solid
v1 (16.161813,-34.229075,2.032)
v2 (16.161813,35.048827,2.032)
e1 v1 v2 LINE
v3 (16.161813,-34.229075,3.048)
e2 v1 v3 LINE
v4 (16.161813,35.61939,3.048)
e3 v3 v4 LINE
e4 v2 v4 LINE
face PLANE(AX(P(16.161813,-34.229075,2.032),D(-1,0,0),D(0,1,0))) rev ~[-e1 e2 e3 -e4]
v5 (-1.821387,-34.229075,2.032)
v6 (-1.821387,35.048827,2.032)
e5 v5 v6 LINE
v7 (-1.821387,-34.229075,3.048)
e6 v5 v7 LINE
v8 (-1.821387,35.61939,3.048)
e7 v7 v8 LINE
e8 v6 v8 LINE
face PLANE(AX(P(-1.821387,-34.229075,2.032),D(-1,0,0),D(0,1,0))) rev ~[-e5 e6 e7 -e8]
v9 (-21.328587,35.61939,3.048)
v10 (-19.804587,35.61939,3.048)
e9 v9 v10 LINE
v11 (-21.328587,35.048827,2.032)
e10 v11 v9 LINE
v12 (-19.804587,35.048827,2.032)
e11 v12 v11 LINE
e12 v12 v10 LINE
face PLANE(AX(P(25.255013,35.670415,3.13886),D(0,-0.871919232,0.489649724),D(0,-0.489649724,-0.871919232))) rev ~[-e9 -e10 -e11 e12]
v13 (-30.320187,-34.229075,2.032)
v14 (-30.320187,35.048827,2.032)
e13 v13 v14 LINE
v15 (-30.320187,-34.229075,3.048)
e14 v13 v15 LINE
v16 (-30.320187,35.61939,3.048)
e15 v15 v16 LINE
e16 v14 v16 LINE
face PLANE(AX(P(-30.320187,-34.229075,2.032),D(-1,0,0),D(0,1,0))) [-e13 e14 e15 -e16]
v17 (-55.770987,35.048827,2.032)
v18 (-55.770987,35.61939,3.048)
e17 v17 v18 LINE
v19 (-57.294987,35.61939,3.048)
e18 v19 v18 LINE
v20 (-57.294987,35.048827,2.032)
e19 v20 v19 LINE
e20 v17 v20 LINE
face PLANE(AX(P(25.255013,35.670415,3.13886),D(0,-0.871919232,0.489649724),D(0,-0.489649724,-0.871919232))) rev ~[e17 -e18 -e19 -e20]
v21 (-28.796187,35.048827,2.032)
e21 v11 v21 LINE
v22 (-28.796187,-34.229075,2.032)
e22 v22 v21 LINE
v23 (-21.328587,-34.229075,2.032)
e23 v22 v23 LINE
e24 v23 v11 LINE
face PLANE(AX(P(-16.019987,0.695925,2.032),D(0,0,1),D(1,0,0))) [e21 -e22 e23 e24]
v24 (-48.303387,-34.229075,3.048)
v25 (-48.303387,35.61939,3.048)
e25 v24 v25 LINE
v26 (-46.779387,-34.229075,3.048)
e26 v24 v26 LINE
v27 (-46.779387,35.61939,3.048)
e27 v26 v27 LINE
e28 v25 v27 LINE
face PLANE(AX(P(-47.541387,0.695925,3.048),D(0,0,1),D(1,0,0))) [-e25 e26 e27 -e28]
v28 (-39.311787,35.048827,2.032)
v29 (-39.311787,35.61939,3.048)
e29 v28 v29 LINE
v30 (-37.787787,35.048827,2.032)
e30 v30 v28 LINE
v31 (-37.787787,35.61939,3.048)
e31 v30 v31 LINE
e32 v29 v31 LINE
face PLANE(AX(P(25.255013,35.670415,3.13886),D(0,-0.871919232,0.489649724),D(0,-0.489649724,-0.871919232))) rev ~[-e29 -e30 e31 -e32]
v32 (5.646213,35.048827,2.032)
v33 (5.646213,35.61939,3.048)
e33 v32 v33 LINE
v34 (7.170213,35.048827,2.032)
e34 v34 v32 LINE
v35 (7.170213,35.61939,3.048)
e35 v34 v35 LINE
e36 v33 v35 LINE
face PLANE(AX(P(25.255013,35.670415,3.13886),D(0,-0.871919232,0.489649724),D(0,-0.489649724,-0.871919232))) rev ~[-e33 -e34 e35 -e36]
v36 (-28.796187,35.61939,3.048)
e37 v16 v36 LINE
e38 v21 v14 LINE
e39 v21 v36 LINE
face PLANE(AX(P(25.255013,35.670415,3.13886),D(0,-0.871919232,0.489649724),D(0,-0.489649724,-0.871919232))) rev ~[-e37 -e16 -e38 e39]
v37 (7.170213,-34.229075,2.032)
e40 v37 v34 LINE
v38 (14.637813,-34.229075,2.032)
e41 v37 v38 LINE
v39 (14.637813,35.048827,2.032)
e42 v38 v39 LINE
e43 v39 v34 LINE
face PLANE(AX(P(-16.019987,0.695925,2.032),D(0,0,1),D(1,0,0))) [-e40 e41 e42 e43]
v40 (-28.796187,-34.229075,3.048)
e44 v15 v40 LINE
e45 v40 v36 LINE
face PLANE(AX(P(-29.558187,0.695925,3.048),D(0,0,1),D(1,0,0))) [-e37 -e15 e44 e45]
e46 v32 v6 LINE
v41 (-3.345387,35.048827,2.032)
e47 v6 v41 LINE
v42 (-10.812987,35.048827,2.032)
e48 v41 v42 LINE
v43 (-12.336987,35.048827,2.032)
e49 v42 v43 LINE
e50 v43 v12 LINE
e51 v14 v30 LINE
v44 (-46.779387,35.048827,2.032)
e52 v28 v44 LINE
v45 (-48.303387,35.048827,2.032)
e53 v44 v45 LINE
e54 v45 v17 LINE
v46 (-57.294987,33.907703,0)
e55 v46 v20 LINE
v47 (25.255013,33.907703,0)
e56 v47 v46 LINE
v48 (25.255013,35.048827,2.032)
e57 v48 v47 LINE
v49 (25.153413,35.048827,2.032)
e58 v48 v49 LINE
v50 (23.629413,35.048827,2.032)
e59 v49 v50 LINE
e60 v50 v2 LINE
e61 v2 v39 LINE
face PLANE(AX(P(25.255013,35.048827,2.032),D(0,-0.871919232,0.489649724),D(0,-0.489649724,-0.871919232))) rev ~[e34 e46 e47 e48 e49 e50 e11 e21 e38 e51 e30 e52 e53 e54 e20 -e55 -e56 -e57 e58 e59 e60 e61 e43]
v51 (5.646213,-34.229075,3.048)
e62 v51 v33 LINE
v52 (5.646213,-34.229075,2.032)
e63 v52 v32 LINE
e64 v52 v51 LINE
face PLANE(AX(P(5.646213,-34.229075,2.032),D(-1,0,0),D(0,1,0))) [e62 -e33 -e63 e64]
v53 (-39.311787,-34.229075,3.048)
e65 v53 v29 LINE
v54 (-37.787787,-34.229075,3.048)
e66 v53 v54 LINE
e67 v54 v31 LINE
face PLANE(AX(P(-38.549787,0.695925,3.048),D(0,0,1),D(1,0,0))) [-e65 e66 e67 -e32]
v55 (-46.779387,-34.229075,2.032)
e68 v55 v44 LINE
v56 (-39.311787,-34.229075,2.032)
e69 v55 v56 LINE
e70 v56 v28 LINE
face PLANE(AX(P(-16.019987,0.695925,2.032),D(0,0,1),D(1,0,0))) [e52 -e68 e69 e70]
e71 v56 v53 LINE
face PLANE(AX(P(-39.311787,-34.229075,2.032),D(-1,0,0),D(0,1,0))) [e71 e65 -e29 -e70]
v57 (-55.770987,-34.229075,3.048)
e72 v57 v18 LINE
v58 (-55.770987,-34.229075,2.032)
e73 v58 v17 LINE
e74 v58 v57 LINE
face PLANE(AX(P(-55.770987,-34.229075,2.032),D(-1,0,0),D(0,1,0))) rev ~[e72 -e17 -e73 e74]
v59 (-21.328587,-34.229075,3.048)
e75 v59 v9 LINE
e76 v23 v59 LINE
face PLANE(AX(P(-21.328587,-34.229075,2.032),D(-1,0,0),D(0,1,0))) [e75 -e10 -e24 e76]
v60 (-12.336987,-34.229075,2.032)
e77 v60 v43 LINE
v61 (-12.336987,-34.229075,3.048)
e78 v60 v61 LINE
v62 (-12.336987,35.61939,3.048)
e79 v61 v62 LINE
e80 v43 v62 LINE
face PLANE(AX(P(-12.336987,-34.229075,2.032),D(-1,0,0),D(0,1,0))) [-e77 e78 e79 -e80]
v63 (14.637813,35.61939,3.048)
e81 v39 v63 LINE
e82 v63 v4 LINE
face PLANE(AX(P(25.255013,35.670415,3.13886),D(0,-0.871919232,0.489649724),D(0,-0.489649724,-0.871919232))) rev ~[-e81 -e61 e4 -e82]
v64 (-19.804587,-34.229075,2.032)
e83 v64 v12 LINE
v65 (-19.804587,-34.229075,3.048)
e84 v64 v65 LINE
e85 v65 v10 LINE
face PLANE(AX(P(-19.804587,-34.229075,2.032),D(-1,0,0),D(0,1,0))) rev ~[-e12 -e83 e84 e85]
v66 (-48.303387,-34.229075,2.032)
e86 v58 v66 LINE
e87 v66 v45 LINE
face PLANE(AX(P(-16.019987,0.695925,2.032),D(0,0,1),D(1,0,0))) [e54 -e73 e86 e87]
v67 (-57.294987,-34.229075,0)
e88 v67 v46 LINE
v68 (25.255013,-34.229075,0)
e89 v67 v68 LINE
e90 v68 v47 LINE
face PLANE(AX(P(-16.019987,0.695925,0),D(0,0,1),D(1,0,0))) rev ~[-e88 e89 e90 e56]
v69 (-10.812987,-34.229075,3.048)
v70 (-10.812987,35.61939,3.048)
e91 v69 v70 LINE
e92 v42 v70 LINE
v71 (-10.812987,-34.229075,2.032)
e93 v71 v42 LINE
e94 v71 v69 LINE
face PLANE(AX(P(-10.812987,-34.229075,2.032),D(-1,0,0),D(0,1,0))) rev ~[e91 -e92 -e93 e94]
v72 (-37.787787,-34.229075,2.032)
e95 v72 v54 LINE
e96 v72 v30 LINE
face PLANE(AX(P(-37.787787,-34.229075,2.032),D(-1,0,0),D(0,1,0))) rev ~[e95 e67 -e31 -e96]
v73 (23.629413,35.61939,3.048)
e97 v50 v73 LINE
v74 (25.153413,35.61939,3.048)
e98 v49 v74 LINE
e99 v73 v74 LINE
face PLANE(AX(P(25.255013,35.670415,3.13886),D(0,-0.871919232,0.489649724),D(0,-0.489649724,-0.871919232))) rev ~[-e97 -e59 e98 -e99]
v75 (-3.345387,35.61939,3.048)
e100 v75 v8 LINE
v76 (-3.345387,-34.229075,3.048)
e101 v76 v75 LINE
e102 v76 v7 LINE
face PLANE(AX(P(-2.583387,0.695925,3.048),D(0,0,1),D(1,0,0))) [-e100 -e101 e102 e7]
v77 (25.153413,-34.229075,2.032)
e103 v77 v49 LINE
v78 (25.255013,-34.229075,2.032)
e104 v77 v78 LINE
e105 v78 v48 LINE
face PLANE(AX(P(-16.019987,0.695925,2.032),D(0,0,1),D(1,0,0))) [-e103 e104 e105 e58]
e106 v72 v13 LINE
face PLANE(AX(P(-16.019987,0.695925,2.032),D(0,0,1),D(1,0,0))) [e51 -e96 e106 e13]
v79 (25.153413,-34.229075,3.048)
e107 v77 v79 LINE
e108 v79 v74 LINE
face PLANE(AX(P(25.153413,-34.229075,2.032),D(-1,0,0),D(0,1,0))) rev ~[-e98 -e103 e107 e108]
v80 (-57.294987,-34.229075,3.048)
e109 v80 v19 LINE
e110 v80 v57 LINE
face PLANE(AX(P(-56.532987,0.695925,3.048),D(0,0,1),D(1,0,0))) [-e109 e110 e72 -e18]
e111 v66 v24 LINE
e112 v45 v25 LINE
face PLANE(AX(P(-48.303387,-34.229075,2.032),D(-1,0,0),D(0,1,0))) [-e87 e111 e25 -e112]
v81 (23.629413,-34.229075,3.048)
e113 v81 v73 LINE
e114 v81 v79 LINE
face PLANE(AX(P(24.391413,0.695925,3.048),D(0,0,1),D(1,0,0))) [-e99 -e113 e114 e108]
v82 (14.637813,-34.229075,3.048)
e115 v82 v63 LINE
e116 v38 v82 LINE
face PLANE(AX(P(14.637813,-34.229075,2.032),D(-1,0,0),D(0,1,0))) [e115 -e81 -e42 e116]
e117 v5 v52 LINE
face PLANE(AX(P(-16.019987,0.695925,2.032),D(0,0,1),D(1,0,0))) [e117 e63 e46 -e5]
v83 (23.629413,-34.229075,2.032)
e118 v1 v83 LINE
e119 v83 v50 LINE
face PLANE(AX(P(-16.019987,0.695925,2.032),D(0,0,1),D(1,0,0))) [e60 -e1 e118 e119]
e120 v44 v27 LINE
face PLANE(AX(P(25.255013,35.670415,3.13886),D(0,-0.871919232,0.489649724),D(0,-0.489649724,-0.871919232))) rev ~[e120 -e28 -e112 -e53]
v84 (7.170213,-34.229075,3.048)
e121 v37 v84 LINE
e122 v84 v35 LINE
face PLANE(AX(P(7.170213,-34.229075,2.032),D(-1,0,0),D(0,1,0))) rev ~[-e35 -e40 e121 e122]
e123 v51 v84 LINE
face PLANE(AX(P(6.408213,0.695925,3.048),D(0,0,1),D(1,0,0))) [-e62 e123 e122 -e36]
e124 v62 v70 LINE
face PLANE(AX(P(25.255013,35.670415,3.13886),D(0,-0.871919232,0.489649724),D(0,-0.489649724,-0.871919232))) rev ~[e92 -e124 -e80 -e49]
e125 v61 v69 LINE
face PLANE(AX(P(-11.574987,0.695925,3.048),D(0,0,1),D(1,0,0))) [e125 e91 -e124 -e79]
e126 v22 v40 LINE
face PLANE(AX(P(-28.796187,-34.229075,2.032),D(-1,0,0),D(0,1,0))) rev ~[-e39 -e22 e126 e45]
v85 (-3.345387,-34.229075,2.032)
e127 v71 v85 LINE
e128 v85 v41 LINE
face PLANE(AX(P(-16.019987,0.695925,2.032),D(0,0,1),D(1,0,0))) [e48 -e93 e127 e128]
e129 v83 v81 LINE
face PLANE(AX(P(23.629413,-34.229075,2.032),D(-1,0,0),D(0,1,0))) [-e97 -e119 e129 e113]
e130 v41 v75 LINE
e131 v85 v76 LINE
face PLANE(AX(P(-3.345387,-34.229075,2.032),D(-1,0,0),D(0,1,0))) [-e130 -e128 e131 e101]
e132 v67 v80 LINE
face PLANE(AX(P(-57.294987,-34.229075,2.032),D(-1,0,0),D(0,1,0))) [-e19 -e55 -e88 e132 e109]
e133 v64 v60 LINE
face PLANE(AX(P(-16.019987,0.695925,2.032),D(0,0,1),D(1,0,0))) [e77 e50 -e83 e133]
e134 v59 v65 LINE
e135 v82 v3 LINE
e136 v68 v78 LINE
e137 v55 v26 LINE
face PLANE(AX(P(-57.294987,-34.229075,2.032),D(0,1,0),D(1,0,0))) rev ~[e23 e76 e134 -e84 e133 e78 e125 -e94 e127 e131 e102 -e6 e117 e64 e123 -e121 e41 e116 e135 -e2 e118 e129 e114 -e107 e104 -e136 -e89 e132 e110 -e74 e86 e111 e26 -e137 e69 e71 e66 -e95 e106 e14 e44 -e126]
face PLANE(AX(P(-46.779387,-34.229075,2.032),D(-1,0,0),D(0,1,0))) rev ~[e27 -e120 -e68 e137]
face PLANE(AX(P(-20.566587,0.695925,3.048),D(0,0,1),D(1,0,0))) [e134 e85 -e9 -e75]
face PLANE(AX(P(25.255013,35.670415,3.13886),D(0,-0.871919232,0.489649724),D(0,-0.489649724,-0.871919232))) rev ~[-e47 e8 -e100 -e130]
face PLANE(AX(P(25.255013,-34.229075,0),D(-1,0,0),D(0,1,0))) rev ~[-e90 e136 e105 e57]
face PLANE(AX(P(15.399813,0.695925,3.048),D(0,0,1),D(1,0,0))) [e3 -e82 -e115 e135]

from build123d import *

# Parameters (mm, degrees)
F0_W     = 82.55
F0_H     = 69.85
F1_DEPTH = 2.032
F2_W     = 1.524
F2_H     = 69.85
F3_DEPTH = 1.016
F5_DEPTH = 88.8746


with BuildPart() as f1:
    # F0 (on Top) → F1 (new body)
    with BuildSketch(Plane.XY):
        with Locations((-16.0199867169, 0.6959252059)):
            Rectangle(F0_W, F0_H)
    extrude(amount=F1_DEPTH)

    # F2 (on face) → F3 (join)
    with BuildSketch(Plane.XY.offset(2.032)):
        with Locations((-56.5329867169, 0.6959252059)):
            Rectangle(F2_W, F2_H)
        with Locations((-47.5413867169, 0.6959252059)):
            Rectangle(F2_W, F2_H)
        with Locations((-38.5497867169, 0.6959252059)):
            Rectangle(F2_W, F2_H)
        with Locations((-29.5581867169, 0.6959252059)):
            Rectangle(F2_W, F2_H)
        with Locations((-20.5665867169, 0.6959252059)):
            Rectangle(F2_W, F2_H)
        with Locations((-11.5749867169, 0.6959252059)):
            Rectangle(F2_W, F2_H)
        with Locations((-2.5833867169, 0.6959252059)):
            Rectangle(F2_W, F2_H)
        with Locations((6.4082132831, 0.6959252059)):
            Rectangle(F2_W, F2_H)
        with Locations((15.3998132831, 0.6959252059)):
            Rectangle(F2_W, F2_H)
        with Locations((24.3914132831, 0.6959252059)):
            Rectangle(F2_W, F2_H)
    extrude(amount=F3_DEPTH)

    # F4 (on face) → F5 (cut)
    with BuildSketch(Plane.YZ.offset(25.2550132831)):
        Polygon((33.9077030866, 0), (33.703327179, -0.3639321658), (35.670414567, -0.3639321658), (35.670414567, 3.138860222), (35.048827404, 2.032), (35.6209252059, 2.032), (35.6209252059, 0), align=None)
        Polygon((35.048827404, 2.032), (33.9077030866, 0), (35.6209252059, 0), (35.6209252059, 2.032), align=None)
    extrude(amount=-F5_DEPTH, mode=Mode.SUBTRACT)


solid = f1.part
